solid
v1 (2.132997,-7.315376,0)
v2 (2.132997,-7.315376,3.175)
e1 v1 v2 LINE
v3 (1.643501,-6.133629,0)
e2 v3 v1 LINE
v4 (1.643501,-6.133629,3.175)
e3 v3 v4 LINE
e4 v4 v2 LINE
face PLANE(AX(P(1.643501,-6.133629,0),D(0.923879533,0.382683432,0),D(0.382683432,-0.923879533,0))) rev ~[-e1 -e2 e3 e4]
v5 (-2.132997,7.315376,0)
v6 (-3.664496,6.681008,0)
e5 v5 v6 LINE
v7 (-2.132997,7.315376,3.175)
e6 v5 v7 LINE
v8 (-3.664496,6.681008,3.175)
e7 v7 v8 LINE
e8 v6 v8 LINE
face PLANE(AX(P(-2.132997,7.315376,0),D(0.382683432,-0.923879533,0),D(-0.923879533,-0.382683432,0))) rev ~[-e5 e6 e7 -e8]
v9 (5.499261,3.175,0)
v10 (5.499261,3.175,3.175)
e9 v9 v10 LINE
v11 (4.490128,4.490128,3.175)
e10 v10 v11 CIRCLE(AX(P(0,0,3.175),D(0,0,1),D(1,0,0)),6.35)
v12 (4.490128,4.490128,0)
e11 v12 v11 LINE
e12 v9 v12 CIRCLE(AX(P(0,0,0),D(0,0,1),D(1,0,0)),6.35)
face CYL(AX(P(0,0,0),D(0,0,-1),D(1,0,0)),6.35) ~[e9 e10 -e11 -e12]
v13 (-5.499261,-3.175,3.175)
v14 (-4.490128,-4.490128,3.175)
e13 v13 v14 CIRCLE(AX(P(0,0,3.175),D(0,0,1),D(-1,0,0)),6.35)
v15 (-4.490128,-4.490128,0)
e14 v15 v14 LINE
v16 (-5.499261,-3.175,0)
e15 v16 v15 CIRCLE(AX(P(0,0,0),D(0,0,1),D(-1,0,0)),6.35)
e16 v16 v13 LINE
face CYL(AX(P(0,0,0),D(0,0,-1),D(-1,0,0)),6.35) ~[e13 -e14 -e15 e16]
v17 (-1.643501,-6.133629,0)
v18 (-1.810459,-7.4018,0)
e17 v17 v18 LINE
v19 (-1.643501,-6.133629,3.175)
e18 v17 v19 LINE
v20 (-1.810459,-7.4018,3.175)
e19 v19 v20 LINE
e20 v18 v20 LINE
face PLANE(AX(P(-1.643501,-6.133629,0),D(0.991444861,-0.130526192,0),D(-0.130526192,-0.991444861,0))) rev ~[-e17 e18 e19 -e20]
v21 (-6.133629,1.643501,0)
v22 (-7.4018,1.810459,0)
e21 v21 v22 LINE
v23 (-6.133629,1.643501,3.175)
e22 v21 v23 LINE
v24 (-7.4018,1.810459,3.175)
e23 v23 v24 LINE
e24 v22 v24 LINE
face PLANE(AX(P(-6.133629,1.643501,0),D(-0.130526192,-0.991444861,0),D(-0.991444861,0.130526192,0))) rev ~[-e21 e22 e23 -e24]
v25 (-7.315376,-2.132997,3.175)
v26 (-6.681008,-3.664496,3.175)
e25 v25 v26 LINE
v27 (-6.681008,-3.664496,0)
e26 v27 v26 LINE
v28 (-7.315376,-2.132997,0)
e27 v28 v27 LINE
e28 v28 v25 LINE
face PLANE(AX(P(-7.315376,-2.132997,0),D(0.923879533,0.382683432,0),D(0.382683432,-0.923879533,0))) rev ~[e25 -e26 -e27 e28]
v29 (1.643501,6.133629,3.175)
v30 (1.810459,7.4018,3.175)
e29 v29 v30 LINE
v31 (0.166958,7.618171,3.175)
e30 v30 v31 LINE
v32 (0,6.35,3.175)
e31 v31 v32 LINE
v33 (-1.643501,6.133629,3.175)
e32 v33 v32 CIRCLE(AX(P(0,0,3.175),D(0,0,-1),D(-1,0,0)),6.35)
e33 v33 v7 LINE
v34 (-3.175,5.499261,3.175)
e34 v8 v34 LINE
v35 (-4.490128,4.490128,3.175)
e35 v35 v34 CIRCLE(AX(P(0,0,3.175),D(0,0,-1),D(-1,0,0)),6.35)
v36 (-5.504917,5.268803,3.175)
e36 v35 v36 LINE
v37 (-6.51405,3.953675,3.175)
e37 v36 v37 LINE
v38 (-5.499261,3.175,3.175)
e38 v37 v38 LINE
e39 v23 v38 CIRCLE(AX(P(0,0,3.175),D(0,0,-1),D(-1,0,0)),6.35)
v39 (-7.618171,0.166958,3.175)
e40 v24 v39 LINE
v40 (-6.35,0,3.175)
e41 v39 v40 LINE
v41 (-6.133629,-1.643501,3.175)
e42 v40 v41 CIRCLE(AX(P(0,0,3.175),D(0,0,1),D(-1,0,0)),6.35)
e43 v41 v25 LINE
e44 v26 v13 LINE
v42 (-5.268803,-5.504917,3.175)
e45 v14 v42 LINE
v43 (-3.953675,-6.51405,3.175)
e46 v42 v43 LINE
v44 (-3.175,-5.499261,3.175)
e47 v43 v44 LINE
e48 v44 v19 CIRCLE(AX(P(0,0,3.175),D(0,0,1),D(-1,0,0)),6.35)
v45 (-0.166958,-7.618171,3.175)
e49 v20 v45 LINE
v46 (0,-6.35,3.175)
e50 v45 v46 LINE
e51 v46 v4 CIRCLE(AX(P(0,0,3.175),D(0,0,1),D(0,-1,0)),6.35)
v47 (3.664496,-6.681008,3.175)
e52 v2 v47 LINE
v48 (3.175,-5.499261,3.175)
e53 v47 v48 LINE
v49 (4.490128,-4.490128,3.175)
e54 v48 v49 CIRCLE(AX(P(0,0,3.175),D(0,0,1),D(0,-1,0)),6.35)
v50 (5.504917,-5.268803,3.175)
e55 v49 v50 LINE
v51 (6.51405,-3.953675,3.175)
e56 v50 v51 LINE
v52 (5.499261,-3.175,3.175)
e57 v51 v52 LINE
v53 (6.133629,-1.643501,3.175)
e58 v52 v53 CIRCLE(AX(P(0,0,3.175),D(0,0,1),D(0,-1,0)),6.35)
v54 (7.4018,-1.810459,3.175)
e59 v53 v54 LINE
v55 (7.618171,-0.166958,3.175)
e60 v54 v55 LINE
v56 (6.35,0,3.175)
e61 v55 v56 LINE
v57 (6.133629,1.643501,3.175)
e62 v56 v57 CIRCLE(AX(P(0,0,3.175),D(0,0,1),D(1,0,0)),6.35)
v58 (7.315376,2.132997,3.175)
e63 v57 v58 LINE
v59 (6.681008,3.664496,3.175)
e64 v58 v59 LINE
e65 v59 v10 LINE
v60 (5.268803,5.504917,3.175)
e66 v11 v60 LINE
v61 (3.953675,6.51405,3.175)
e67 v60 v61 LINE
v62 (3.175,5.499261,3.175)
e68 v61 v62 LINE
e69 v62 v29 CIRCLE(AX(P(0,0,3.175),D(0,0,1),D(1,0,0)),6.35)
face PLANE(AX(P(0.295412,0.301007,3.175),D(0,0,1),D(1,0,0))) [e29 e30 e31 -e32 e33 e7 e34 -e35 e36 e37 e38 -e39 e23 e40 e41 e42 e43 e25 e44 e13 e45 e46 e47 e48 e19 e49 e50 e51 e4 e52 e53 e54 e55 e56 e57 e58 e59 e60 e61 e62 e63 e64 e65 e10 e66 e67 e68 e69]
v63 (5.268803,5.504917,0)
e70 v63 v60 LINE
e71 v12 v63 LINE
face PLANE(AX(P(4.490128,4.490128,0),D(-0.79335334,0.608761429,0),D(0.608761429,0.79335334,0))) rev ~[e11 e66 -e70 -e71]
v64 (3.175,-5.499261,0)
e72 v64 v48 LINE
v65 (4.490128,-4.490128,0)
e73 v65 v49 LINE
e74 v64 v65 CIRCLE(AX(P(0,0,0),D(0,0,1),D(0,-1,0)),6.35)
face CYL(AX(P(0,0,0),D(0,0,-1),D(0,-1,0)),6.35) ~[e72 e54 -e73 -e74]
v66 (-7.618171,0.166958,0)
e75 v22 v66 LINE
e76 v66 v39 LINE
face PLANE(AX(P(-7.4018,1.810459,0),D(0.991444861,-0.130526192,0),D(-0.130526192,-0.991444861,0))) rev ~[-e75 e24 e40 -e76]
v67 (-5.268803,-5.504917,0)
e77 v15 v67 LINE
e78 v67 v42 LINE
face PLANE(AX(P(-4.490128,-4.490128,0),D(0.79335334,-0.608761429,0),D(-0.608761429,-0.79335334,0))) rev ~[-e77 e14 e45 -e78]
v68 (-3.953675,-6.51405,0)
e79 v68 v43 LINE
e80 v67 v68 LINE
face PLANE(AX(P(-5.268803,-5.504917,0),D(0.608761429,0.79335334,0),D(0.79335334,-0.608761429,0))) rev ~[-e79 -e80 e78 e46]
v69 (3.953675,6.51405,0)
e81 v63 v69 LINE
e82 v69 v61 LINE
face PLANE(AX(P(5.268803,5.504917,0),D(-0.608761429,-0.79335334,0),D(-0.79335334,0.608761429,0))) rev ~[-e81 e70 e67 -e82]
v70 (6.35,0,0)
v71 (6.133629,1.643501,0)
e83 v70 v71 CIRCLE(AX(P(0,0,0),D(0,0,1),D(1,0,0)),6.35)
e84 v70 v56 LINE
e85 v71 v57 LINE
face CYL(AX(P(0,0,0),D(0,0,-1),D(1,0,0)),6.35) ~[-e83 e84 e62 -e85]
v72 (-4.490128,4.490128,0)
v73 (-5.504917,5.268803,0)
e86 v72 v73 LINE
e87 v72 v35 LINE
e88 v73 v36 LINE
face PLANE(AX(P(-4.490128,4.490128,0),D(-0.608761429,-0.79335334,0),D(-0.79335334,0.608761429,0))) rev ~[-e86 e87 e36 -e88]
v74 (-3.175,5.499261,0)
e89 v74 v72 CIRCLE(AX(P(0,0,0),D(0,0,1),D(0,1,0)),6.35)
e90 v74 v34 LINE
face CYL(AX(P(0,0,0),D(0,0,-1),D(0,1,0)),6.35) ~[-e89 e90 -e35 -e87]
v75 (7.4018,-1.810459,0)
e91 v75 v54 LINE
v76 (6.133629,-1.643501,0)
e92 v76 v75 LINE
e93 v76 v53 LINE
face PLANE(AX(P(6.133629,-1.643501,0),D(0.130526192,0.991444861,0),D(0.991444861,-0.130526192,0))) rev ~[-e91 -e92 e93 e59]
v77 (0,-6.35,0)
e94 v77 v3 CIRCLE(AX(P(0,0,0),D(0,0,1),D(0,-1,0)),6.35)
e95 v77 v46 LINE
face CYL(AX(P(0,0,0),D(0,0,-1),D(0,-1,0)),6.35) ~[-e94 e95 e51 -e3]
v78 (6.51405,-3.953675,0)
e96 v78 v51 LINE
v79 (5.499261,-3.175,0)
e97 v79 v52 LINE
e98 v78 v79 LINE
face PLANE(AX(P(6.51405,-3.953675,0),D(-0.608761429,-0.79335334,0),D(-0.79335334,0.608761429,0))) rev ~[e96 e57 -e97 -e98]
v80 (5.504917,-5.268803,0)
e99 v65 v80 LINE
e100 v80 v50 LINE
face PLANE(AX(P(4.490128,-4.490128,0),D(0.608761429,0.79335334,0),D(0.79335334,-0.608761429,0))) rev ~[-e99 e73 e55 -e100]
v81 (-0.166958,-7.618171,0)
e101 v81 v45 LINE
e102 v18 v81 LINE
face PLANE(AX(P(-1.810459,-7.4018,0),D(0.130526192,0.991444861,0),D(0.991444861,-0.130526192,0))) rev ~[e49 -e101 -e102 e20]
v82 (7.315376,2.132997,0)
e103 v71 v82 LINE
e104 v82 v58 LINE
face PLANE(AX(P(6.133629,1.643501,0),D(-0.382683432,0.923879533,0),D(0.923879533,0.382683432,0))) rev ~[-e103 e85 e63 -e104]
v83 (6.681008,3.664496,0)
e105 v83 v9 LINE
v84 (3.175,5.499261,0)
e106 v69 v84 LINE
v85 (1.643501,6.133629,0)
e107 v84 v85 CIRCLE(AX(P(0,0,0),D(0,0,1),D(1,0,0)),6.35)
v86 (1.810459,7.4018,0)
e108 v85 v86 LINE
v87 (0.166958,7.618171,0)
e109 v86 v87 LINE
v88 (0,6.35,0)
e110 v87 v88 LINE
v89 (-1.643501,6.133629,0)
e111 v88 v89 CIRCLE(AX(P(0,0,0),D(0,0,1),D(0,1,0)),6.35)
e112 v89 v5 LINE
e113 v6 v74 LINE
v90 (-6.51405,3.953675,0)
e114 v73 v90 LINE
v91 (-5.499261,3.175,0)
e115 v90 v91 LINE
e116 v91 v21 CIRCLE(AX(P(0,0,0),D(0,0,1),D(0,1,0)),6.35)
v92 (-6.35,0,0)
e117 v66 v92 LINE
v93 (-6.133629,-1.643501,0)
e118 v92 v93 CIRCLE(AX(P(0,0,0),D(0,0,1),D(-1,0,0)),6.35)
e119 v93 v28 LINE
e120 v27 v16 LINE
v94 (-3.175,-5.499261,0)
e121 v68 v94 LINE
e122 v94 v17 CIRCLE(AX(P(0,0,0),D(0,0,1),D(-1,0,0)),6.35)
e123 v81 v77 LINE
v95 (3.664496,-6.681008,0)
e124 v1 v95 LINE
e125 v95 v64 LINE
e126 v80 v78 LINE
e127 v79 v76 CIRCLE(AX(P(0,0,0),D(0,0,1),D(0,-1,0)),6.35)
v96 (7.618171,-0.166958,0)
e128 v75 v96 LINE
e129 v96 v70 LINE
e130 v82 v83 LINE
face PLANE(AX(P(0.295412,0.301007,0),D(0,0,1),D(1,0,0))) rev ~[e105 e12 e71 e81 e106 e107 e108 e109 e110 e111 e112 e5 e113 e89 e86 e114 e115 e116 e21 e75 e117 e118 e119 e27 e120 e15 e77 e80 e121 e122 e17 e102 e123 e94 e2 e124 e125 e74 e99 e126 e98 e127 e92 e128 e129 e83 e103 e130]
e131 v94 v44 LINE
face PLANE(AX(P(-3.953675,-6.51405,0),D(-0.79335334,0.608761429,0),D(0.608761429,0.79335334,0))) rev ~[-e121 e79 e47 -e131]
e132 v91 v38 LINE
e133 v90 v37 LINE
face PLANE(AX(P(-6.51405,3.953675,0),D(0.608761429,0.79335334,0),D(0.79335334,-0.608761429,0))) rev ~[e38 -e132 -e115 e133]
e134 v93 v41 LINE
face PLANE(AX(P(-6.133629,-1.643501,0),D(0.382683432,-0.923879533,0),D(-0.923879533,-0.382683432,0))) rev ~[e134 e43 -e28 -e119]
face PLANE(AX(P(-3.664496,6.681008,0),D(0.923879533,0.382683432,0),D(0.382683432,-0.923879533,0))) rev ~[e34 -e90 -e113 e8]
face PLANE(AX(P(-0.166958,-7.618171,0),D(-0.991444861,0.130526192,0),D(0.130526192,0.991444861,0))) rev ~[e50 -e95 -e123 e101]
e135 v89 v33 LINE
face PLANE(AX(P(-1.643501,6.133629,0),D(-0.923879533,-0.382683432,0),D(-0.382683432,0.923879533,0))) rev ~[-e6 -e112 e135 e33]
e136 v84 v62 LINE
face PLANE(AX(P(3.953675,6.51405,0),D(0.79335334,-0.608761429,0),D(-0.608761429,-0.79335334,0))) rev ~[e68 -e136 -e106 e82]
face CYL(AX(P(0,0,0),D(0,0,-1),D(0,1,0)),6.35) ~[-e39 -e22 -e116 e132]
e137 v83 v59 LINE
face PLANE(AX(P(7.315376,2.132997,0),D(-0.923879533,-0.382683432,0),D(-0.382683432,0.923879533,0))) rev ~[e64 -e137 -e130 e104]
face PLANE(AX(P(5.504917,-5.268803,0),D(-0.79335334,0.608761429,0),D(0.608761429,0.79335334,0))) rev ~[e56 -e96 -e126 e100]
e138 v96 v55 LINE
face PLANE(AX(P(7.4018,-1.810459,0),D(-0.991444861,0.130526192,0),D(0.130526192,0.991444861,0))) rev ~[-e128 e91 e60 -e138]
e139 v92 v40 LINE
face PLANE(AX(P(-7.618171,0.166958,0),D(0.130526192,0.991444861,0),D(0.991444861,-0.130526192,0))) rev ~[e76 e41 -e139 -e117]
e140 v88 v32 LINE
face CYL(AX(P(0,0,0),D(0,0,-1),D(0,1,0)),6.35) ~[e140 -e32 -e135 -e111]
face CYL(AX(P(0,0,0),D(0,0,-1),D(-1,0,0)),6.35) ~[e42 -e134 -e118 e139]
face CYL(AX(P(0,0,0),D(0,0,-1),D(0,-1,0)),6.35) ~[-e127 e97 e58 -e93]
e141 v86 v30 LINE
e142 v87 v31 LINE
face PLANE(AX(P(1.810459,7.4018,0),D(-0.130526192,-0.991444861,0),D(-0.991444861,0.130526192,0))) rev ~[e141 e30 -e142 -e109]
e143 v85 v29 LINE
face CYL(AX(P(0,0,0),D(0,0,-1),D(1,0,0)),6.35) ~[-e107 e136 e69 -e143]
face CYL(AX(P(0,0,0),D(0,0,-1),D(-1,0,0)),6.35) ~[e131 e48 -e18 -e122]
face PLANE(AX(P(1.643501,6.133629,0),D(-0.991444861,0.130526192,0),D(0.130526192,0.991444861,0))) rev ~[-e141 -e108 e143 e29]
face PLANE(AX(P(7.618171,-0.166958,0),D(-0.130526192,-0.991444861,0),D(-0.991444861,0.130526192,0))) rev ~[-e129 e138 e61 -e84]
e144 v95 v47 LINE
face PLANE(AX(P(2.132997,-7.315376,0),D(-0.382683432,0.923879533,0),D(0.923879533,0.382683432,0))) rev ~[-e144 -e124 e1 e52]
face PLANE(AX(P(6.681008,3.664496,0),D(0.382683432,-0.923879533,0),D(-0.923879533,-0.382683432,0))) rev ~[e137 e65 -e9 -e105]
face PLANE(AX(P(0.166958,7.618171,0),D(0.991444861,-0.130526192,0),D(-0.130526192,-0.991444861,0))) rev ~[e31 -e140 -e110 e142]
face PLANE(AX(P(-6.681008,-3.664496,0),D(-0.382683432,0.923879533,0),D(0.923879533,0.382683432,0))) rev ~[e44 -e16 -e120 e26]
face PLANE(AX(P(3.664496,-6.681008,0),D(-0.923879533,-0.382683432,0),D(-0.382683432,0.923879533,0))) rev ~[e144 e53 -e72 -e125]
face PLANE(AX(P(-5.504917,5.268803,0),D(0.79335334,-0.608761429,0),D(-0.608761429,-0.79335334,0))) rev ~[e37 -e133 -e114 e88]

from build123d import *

# Parameters (mm, degrees)
F1_DEPTH = 3.175
F2_COUNT = 12


# Not quite as in the source:
# - a length typed as a fraction of an inch, garbled in the dataset ("3 / 203.2 mm" for 3/8 in), is restored


with BuildPart() as f1:
    # F0 (on Top) → F1 (new body)
    with BuildSketch(Plane.XY):
        with BuildLine():
            ThreePointArc((0, 6.35), (-4.4901280605, -4.4901280605), (6.35, 0))
            ThreePointArc((6.35, 0), (5.0377937108, 3.8656350742), (1.6435009364, 6.1336289969))
            ThreePointArc((1.6435009364, 6.1336289969), (0.8288413206, 6.2956748697), (0, 6.35))
        make_face()
        with BuildLine():
            ThreePointArc((0, 6.35), (0.8288413206, 6.2956748697), (1.6435009364, 6.1336289969))
            Line((1.6435009364, 6.1336289969), (1.8104587787, 7.4017997143))
            Line((1.8104587787, 7.4017997143), (0.1669578423, 7.6181707174))
            Line((0.1669578423, 7.6181707174), (0, 6.35))
        make_face()
    extrude(amount=F1_DEPTH)

    # F2: F1 ×12 about axis
    f2_axis = Axis((0, 0, 0), (0, 0, -1))


with BuildPart() as f1_1:
    add(f1.part)
    for i in range(1, F2_COUNT):
        add(f1.part.rotate(f2_axis, i * 360 / F2_COUNT))


solid = f1_1.part
